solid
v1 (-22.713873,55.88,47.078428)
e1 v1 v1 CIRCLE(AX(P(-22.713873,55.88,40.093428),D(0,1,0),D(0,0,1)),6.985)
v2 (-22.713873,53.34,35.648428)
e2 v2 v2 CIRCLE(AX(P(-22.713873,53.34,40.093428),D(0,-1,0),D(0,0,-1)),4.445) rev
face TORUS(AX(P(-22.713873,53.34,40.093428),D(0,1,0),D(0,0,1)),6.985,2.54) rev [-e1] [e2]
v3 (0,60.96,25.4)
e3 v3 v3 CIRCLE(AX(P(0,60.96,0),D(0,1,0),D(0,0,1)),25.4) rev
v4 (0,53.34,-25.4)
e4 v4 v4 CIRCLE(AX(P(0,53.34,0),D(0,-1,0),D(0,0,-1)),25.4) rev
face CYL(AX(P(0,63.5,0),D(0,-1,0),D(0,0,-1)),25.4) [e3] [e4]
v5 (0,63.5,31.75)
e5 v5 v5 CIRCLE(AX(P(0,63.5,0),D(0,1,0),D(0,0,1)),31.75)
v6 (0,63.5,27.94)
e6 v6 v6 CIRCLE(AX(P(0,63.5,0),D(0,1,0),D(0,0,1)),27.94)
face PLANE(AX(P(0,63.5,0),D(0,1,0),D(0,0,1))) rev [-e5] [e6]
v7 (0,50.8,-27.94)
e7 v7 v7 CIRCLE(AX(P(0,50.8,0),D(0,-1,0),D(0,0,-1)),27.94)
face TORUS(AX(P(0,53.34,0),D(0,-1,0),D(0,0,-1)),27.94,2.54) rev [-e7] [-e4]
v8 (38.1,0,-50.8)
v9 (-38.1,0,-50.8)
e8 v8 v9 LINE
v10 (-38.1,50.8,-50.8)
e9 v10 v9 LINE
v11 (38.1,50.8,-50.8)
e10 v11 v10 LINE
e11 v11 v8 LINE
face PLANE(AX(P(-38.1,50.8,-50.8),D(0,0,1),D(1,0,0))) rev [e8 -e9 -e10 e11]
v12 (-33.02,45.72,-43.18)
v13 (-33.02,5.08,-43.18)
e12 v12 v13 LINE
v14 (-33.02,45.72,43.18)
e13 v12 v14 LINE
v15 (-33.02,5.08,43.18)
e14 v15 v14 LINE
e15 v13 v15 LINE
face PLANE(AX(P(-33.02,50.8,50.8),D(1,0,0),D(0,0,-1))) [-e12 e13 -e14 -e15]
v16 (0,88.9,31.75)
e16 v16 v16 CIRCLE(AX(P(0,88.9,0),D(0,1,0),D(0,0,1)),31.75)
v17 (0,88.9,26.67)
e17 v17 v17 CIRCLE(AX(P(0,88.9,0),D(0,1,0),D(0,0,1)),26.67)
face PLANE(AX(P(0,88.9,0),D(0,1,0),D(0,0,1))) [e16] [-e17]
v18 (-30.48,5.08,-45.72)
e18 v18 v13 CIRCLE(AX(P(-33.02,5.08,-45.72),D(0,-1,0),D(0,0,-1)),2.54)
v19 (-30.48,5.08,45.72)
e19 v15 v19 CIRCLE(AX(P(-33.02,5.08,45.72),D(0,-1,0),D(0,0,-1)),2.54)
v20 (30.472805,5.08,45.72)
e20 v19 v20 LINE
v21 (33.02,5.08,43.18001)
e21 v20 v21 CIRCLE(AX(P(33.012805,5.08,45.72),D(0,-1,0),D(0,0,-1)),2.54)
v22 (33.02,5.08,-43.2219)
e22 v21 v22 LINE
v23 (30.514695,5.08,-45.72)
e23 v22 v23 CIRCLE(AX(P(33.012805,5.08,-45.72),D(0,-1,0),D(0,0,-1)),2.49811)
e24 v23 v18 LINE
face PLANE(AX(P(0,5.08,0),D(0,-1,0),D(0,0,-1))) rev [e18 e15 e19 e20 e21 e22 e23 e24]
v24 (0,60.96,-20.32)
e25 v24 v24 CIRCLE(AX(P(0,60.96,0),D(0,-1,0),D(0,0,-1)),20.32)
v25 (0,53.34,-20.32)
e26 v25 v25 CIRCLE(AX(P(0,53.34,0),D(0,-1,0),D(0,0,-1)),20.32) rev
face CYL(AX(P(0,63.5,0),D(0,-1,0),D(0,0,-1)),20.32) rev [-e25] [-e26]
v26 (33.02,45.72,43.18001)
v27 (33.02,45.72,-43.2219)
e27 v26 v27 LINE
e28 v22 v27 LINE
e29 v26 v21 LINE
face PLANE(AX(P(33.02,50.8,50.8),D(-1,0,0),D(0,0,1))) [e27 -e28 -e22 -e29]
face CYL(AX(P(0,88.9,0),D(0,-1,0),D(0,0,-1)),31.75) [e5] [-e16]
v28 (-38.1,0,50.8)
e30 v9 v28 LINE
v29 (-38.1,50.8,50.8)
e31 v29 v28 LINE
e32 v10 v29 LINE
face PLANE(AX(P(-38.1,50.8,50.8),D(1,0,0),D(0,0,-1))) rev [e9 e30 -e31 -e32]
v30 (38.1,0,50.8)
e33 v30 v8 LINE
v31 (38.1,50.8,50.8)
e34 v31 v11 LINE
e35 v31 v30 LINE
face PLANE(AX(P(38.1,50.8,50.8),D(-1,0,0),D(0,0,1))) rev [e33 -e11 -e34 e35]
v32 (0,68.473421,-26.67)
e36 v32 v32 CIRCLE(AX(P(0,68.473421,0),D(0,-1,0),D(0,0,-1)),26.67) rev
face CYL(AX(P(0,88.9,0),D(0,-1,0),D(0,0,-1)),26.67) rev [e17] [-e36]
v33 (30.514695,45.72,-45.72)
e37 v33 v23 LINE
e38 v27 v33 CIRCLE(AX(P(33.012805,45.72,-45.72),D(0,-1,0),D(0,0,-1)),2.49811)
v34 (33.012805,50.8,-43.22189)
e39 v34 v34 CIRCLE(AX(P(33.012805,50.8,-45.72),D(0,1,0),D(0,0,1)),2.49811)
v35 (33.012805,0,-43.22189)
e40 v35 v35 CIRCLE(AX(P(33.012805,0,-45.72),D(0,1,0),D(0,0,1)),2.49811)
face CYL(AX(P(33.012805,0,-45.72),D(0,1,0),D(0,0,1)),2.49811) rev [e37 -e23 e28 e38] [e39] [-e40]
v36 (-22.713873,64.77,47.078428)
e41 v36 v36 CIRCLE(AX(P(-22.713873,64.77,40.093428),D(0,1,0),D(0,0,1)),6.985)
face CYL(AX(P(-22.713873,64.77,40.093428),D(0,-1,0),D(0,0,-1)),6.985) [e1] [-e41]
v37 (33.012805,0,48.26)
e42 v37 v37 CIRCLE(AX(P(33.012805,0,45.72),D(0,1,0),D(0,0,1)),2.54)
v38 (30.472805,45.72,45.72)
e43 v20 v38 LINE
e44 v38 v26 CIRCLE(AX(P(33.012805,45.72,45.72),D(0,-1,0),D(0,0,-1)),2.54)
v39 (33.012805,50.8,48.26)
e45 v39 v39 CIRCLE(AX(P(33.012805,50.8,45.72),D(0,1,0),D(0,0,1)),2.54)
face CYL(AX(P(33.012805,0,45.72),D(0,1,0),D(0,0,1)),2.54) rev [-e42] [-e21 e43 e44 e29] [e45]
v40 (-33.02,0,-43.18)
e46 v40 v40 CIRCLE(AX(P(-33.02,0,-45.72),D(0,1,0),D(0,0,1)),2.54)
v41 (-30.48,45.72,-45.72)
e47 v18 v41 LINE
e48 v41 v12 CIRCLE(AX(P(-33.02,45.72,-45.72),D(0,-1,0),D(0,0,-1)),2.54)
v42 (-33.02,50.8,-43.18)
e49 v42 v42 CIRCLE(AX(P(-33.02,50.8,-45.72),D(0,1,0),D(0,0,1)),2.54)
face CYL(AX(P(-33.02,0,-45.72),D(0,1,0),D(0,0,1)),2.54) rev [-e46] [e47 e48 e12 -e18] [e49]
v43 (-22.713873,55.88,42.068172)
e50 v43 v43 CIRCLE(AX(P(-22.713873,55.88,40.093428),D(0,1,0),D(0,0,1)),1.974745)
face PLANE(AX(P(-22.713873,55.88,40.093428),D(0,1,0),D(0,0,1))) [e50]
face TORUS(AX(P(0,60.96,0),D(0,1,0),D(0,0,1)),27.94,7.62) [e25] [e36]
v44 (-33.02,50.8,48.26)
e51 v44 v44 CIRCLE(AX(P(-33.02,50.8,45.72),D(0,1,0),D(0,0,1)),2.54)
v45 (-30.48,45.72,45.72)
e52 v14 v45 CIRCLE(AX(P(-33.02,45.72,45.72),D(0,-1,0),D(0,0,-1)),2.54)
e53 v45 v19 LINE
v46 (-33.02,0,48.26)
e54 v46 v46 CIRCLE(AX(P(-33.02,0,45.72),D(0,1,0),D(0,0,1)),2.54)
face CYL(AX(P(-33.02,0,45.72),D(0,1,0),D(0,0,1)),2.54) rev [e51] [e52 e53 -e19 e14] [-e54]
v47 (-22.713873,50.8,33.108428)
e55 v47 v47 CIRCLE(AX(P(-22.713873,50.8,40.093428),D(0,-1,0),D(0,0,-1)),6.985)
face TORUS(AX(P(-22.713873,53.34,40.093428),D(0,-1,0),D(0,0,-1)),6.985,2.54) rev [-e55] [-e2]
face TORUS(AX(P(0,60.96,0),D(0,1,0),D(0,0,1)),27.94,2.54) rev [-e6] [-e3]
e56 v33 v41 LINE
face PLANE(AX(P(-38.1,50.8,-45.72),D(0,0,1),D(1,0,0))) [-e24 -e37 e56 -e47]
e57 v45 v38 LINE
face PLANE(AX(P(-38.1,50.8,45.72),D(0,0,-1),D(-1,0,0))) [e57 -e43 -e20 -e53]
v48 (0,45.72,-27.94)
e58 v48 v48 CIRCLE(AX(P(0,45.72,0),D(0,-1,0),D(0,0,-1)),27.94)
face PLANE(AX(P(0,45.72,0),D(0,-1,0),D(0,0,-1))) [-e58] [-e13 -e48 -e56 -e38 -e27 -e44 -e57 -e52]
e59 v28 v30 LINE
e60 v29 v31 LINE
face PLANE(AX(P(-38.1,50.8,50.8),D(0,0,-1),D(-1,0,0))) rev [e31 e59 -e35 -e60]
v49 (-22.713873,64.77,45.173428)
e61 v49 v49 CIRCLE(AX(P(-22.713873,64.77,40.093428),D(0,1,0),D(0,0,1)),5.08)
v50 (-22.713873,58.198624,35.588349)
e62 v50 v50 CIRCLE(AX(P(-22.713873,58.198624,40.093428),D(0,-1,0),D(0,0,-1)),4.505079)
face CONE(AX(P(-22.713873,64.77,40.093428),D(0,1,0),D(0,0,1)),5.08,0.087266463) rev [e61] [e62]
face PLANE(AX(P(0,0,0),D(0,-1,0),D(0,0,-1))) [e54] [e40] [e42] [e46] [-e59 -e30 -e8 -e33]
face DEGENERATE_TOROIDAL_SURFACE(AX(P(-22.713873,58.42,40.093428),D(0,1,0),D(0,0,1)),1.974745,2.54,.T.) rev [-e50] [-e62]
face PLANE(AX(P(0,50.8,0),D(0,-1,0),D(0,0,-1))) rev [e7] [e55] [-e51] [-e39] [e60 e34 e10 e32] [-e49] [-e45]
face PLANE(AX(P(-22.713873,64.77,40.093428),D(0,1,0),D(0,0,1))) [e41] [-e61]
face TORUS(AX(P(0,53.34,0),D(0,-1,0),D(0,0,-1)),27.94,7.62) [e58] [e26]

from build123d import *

# Parameters (mm, degrees)
SKETCH1_W           = 76.2
SKETCH1_H           = 101.6
BOSS_EXTRUDE1_DEPTH = 50.8
SKETCH2_R           = 25.4
BOSS_EXTRUDE2_DEPTH = 12.7
SKETCH3_R           = 31.75
BOSS_EXTRUDE3_DEPTH = 25.4
FILLET1_R           = 2.54
FILLET2_R           = 2.54
SHELL1_T            = -5.08
SKETCH4_R           = 2.54
SKETCH4_R_2         = 2.498110056
CUT_EXTRUDE1_DEPTH  = 82.319677815
SKETCH5_R           = 4.445
BOSS_EXTRUDE4_DEPTH = 5.08
SKETCH6_R           = 6.985
BOSS_EXTRUDE5_DEPTH = 8.89
SKETCH7_R           = 5.08
CUT_EXTRUDE2_DEPTH  = 8.89
CUT_EXTRUDE2_DRAFT  = -5
FILLET3_R           = 2.54
FILLET4_R           = 2.54
FILLET5_R           = 2.54


with BuildPart() as part:
    # Sketch1 → Boss-Extrude1 (new body)
    with BuildSketch(Plane(origin=(0, 0, 0), x_dir=(1, 0, 0), z_dir=(0, 1, 0))):
        Rectangle(SKETCH1_W, SKETCH1_H)
    extrude(amount=BOSS_EXTRUDE1_DEPTH)

    # Sketch2 → Boss-Extrude2 (add)
    with BuildSketch(Plane(origin=(0, 50.8, 0), x_dir=(1, 0, 0), z_dir=(0, 1, 0))):
        with Locations(Location((0, 0, 0), (0, 0, 90))):
            Circle(SKETCH2_R)
    extrude(amount=BOSS_EXTRUDE2_DEPTH)

    # Sketch3 → Boss-Extrude3 (add)
    with BuildSketch(Plane(origin=(0, 63.5, 0), x_dir=(1, 0, 0), z_dir=(0, 1, 0))):
        with Locations(Location((0, 0, 0), (0, 0, 270))):
            Circle(SKETCH3_R)
    extrude(amount=BOSS_EXTRUDE3_DEPTH)

    # Fillet1
    fillet1_edges = [part.edges().sort_by_distance(p)[0] for p in [
        (0, 50.8, 25.4),
    ]]
    fillet(fillet1_edges, radius=FILLET1_R)

    # Fillet2
    fillet2_edges = [part.edges().sort_by_distance(p)[0] for p in [
        (0, 63.5, 25.4),
    ]]
    fillet(fillet2_edges, radius=FILLET2_R)

    # Shell1
    shell1_openings = [part.faces().sort_by_distance(p)[0] for p in [
        (0, 88.9, 0),
    ]]
    offset(amount=SHELL1_T, openings=shell1_openings)

    # Sketch4 → Cut-Extrude1 (cut, through all)
    with BuildSketch(Plane(origin=(0, 50.8, 0), x_dir=(1, 0, 0), z_dir=(0, 1, 0))):
        with Locations(Location((-33.02, 45.72, 0), (0, 0, 270))):
            Circle(SKETCH4_R)
        with Locations(Location((33.012804965, 45.72, 0), (0, 0, 270))):
            Circle(SKETCH4_R_2)
        with Locations(Location((-33.02, -45.72, 0), (0, 0, 270))):
            Circle(SKETCH4_R)
        with Locations(Location((33.012804965, -45.72, 0), (0, 0, 270))):
            Circle(SKETCH4_R)
    extrude(amount=-CUT_EXTRUDE1_DEPTH, mode=Mode.SUBTRACT)

    # Sketch5 → Boss-Extrude4 (add)
    with BuildSketch(Plane(origin=(0, 50.8, 0), x_dir=(1, 0, 0), z_dir=(0, 1, 0))):
        with Locations(Location((-22.7138733, -40.09342787, 0), (0, 0, 90))):
            Circle(SKETCH5_R)
    extrude(amount=BOSS_EXTRUDE4_DEPTH)

    # Sketch6 → Boss-Extrude5 (add)
    with BuildSketch(Plane(origin=(0, 55.88, 0), x_dir=(1, 0, 0), z_dir=(0, 1, 0))):
        with Locations(Location((-22.7138733, -40.09342787, 0), (0, 0, 270))):
            Circle(SKETCH6_R)
    extrude(amount=BOSS_EXTRUDE5_DEPTH)


with BuildPart() as cut_extrude2_tool:
    # Sketch7 → Cut-Extrude2 (with draft: the straight prism first)
    with BuildSketch(Plane(origin=(0, 64.77, 0), x_dir=(1, 0, 0), z_dir=(0, 1, 0))):
        with Locations((-22.7138733, -40.09342787)):
            Circle(SKETCH7_R)
    extrude(amount=-CUT_EXTRUDE2_DEPTH)
    # Cut-Extrude2: the draft: its side faces are tilted about the plane it starts from
    cut_extrude2_sides = [cut_extrude2_tool.faces().sort_by_distance(p)[0] for p in [
        (-27.7938733, 60.325, 40.09342787),
    ]]
    draft(cut_extrude2_sides, Plane(origin=(0, 64.77, 0), x_dir=(1, 0, 0), z_dir=(0, 1, 0)), CUT_EXTRUDE2_DRAFT)


with BuildPart() as part_1:
    add(part.part)

    # Cut-Extrude2: cut by cut_extrude2_tool
    add(cut_extrude2_tool.part, mode=Mode.SUBTRACT)

    # Fillet3
    fillet3_edges = [part_1.edges().sort_by_distance(p)[0] for p in [
        (-22.7138733, 50.8, 44.53842787),
    ]]
    fillet(fillet3_edges, radius=FILLET3_R)

    # Fillet4
    fillet4_edges = [part_1.edges().sort_by_distance(p)[0] for p in [
        (-22.7138733, 55.88, 44.53842787),
    ]]
    fillet(fillet4_edges, radius=FILLET4_R - 0.0001)  # a hair under: the kernel refuses the full size

    # Fillet5
    fillet5_edges = [part_1.edges().sort_by_distance(p)[0] for p in [
        (-27.016099081, 55.88, 40.09342787),
    ]]
    fillet(fillet5_edges, radius=FILLET5_R)


solid = part_1.part
